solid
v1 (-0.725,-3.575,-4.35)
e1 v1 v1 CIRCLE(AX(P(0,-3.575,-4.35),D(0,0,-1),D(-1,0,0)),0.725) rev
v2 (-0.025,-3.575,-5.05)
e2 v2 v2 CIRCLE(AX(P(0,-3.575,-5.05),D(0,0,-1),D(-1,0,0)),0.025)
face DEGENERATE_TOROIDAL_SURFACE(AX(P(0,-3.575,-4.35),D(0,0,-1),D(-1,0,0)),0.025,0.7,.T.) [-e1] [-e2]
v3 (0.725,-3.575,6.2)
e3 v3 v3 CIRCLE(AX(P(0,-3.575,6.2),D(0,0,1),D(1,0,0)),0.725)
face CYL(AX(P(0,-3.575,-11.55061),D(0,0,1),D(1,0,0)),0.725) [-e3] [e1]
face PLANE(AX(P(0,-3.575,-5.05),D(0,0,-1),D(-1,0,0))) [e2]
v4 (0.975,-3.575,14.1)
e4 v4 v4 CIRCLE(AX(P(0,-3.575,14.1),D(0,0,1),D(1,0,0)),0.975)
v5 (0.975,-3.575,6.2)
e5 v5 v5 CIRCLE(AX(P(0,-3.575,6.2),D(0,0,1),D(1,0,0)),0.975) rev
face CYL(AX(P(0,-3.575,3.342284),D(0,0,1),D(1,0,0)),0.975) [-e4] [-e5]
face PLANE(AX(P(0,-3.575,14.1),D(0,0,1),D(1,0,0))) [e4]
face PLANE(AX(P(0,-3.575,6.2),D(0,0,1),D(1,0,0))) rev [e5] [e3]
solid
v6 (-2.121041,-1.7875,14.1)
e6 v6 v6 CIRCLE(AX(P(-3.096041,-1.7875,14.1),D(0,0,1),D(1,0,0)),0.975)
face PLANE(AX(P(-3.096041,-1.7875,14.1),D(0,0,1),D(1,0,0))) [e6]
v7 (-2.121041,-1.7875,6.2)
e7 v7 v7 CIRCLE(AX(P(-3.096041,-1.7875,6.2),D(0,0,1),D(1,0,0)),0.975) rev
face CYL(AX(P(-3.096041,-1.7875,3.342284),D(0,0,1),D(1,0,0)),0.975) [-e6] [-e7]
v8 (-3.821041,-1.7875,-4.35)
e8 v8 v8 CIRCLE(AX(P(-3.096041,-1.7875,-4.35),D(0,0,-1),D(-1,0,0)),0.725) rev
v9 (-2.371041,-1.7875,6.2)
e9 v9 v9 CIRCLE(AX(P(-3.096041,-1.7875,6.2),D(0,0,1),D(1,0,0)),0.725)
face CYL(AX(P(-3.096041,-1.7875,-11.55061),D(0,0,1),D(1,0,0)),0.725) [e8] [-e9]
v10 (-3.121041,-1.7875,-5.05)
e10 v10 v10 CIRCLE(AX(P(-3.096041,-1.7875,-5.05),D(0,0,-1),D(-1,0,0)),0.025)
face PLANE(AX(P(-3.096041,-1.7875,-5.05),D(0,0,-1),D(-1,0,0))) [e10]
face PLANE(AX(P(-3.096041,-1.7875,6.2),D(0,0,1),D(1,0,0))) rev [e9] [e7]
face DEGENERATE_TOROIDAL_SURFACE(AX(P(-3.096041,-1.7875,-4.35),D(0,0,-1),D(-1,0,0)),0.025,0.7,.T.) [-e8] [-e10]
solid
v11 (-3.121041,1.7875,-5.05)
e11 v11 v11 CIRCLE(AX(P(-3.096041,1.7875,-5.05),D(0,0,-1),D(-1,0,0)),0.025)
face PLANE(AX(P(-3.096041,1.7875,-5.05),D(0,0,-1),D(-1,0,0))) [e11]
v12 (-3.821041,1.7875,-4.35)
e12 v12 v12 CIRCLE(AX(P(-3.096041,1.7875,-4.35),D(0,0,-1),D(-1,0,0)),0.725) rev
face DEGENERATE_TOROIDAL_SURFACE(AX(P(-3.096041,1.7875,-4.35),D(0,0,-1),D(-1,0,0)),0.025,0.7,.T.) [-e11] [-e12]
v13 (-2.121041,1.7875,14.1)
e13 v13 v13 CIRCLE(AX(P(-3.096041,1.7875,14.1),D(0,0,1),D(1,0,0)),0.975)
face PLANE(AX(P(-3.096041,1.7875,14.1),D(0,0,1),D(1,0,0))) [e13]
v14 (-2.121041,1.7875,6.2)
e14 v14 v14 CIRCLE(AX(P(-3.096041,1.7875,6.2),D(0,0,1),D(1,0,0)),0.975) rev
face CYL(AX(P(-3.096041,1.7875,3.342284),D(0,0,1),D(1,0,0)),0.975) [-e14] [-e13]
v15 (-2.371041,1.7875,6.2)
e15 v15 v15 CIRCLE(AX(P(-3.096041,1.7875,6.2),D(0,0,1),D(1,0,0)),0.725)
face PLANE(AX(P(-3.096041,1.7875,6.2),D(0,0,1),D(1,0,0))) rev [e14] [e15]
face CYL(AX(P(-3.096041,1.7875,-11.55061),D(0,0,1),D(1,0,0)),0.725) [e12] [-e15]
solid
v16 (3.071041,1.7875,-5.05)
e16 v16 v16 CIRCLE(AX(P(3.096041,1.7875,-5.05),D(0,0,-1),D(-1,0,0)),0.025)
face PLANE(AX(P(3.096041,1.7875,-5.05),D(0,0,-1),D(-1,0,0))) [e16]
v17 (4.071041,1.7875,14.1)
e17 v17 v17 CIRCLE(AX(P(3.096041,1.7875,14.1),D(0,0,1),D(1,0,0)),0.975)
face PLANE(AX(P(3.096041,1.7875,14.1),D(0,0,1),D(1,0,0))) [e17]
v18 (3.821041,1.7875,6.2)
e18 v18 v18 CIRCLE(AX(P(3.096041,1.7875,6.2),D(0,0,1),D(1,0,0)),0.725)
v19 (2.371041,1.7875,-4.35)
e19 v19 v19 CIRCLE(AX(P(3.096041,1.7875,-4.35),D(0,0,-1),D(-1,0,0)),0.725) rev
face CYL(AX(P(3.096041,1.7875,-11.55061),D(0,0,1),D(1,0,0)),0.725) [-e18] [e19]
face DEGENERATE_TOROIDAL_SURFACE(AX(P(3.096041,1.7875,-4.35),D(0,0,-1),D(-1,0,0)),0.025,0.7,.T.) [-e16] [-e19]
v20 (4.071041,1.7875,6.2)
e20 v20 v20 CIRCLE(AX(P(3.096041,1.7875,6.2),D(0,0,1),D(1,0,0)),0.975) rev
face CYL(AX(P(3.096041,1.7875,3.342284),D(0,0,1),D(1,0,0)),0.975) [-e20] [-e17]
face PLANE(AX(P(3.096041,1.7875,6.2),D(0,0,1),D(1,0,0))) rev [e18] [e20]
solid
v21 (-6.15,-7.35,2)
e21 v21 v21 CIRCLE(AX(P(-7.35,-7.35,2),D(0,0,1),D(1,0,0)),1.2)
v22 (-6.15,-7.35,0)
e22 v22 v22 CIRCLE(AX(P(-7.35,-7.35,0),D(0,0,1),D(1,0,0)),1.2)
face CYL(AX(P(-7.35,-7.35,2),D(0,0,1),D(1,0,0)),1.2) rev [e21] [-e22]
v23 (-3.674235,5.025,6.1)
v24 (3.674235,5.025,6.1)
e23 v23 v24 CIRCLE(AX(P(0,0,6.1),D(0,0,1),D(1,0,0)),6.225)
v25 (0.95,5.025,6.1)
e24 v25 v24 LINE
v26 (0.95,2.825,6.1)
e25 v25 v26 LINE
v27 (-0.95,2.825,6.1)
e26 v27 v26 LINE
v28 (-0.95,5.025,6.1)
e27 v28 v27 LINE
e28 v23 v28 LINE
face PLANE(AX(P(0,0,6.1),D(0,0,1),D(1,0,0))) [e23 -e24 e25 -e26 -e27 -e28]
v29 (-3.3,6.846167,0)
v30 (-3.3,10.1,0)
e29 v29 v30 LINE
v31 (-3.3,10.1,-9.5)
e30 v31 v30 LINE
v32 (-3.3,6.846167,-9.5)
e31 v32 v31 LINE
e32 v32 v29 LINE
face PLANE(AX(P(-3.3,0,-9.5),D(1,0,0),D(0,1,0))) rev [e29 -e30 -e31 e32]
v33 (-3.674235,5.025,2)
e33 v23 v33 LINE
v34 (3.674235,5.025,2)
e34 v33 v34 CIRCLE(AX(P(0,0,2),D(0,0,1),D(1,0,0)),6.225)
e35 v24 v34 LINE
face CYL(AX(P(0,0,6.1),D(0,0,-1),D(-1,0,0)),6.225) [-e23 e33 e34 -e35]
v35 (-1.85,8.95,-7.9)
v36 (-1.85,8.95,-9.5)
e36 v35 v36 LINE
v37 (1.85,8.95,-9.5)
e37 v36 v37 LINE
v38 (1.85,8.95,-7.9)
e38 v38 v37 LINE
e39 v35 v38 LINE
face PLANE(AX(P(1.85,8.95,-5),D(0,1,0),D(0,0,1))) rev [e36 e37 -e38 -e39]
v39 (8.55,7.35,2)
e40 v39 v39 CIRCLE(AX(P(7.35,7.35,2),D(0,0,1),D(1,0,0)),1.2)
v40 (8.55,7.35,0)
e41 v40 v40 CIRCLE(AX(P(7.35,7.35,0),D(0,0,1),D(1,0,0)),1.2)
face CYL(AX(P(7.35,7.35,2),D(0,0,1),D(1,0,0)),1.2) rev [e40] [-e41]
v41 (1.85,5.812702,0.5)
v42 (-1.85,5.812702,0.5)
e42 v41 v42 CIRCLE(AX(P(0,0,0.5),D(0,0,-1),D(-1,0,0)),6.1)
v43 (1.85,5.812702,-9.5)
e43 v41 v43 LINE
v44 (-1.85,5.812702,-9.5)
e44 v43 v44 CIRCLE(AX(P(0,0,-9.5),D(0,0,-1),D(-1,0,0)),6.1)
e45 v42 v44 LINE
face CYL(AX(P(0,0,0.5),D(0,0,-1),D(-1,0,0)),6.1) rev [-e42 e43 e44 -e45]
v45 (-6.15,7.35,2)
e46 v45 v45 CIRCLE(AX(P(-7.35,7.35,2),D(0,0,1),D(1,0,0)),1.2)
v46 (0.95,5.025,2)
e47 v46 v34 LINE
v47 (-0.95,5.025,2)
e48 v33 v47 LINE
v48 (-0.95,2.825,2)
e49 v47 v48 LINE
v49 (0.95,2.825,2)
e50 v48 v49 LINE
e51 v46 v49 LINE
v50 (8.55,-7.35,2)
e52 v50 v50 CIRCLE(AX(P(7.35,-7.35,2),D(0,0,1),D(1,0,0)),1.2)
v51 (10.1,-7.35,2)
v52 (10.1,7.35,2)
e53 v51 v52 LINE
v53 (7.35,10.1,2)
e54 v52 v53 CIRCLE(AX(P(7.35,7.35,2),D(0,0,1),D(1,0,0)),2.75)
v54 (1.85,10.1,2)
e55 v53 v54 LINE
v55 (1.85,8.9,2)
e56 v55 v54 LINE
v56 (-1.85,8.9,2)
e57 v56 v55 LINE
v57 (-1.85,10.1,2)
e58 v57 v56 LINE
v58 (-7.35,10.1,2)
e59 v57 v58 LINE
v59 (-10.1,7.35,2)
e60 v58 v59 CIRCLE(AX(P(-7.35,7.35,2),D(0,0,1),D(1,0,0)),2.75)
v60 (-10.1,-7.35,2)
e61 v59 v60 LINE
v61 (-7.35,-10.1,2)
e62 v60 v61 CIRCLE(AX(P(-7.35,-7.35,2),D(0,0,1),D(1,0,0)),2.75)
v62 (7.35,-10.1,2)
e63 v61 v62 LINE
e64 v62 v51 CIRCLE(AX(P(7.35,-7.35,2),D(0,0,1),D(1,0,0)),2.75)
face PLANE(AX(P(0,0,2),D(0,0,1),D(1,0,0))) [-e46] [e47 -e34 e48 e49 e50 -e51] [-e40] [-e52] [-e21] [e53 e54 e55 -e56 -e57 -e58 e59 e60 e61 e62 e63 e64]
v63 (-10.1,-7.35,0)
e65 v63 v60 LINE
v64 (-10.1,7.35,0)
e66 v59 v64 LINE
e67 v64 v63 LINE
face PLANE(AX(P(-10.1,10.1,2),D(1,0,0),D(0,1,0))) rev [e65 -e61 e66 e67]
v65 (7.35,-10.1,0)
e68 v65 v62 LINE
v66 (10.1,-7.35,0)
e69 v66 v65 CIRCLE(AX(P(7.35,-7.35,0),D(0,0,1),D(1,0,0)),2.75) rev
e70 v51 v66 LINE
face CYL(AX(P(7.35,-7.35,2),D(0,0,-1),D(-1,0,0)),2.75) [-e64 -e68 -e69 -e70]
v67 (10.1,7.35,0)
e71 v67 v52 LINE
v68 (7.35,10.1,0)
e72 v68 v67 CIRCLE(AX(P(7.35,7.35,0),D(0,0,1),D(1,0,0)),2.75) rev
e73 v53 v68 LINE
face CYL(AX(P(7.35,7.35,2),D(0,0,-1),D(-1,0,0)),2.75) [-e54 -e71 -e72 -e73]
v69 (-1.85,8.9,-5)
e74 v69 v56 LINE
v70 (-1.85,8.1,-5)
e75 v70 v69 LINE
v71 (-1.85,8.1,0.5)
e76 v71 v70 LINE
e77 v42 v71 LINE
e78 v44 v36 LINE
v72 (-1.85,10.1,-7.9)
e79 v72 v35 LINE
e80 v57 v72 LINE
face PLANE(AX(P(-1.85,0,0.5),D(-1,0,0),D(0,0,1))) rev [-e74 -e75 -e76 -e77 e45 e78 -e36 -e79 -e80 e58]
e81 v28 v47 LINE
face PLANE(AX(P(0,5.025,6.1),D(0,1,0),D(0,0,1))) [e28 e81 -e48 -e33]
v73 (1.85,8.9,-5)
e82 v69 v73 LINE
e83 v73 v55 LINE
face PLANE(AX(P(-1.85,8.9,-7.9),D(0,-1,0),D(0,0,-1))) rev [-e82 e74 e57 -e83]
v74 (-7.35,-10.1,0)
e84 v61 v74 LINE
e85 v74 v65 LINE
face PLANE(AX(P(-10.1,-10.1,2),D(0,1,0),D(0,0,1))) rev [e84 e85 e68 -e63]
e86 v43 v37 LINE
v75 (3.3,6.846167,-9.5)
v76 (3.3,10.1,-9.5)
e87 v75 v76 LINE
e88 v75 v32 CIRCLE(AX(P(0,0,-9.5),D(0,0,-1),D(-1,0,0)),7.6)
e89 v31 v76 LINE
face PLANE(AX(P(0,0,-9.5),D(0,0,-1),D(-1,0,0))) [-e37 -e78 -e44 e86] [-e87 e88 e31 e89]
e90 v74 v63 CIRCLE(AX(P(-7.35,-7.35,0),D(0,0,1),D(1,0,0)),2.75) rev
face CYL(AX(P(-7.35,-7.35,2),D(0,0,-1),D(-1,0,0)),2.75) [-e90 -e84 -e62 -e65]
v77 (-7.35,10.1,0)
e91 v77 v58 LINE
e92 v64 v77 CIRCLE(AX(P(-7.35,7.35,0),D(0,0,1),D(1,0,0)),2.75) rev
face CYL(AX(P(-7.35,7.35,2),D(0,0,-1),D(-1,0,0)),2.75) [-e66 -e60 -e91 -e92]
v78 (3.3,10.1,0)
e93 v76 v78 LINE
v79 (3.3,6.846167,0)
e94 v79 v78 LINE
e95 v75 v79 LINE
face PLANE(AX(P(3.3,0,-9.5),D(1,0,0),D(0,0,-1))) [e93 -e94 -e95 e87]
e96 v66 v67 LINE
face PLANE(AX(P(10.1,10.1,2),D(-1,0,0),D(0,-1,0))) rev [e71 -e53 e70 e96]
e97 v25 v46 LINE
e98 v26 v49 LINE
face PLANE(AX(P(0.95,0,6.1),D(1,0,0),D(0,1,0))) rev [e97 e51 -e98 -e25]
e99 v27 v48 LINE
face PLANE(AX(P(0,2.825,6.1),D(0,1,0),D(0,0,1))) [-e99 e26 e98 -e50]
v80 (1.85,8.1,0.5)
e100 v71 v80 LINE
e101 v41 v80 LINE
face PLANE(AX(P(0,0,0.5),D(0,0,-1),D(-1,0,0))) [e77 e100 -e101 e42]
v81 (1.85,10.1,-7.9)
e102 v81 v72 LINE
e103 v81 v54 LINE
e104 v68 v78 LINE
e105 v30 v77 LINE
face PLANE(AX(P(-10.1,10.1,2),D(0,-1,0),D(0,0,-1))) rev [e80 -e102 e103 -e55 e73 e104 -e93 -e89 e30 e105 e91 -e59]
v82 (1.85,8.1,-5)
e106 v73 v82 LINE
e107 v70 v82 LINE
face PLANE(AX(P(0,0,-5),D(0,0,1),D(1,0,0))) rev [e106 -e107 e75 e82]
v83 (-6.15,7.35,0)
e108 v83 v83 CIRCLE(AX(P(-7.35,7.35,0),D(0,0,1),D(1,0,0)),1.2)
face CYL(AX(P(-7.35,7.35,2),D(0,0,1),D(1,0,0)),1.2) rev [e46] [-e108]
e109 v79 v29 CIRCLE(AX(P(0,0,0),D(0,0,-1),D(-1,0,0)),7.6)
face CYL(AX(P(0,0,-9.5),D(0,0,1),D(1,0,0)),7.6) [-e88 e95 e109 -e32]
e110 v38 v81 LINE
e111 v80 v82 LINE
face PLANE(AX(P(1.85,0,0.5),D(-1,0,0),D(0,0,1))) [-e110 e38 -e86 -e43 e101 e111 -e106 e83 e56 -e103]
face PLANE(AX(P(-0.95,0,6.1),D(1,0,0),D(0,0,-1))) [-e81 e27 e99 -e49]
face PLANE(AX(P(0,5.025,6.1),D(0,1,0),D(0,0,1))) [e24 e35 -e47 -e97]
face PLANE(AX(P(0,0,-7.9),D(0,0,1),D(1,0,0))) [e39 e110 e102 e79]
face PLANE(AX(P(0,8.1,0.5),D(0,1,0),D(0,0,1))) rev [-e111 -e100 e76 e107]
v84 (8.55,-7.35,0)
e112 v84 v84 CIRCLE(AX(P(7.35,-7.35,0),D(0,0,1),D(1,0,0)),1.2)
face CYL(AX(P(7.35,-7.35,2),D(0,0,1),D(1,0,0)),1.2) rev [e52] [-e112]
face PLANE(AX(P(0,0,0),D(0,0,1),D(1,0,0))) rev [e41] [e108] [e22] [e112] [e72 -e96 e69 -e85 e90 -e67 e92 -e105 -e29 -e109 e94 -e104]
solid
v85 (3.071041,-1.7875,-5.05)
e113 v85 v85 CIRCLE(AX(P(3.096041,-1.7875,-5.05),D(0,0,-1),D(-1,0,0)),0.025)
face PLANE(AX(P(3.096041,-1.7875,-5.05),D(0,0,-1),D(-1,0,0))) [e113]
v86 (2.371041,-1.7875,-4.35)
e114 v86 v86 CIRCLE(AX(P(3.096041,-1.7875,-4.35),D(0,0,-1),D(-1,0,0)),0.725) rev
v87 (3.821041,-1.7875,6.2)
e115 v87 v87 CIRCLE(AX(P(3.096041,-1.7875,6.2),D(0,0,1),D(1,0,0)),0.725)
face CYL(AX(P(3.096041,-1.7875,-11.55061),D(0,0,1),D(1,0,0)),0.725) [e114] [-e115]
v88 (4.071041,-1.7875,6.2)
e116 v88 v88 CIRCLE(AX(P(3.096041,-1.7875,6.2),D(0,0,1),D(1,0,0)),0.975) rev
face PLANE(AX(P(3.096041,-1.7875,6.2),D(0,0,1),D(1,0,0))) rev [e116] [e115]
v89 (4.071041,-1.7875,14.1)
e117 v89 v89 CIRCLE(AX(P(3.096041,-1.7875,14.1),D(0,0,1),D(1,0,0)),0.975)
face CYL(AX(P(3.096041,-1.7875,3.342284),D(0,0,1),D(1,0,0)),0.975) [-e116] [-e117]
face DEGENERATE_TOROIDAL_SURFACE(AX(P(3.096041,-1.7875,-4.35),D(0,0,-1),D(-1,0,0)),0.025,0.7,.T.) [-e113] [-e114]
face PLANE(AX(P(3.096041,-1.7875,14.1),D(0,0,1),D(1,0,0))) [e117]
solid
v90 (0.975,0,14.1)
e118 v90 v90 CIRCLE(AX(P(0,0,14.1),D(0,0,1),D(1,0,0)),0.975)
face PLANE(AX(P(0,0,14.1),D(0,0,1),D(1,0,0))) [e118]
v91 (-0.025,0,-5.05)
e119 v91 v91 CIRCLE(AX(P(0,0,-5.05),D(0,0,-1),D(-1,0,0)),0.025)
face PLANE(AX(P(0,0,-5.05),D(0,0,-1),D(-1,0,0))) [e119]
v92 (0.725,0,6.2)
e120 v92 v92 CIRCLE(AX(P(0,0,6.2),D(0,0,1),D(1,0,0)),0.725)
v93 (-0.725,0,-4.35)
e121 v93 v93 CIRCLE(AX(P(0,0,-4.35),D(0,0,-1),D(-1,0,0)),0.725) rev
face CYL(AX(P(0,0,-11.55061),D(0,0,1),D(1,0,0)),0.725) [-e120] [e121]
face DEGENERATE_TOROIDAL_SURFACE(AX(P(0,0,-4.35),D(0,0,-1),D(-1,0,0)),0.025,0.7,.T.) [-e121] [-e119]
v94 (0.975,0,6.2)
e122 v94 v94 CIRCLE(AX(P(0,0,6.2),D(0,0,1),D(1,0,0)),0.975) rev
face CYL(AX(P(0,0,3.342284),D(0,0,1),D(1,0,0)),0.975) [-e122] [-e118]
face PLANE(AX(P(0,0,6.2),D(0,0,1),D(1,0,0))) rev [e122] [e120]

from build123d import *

# Parameters (mm, degrees)
SKICA1_W                     = 20.2
SKICA1_H                     = 20.2
P_IDAT_VYSUNUT_M1_DEPTH      = 2
F_2_4_2_4_PR_M_R_D_RY1_D     = 2.4
F_2_4_2_4_PR_M_R_D_RY1_DEPTH = 25
F_2_4_2_4_PR_M_R_D_RY1_TIP   = 0.721032743
ZAOBLIT1_R                   = 2.75
P_IDAT_VYSUNUT_M2_DEPTH      = 9.5
ODEBRAT_VYSUNUT_M1_DEPTH     = 10
SKICA7_W                     = 3.7
SKICA7_H                     = 1.7
ODEBRAT_VYSUNUT_M2_DEPTH     = 4.5
SKICA8_W                     = 3.7
SKICA8_H                     = 2.4
ODEBRAT_VYSUNUT_M3_DEPTH     = 9.9
P_IDAT_VYSUNUT_M4_DEPTH      = 4.1
P_IDAT_VYSUNUT_M3_DEPTH      = 5.55
P_IDAT_VYSUNUT_M3_DEPTH_BACK = 13.6
SKICA9_R                     = 0.725
ZAOBLIT2_R                   = 0.7
SKICA11_R                    = 0.975
P_IDAT_VYSUNUT_M5_DEPTH      = 7.9


# Read off the part's stored shape, not the designer's step: Skica-pole2
with BuildPart() as part:
    # Skica1 → Přidat vysunutím1 (new body)
    with BuildSketch(Plane.XY):
        Rectangle(SKICA1_W, SKICA1_H)
    extrude(amount=P_IDAT_VYSUNUT_M1_DEPTH)

    # Ø2.4 (2.4) průměr díry1
    with Locations(Plane.XY.offset(2)):
        with Locations((-7.35, 7.35), (7.35, 7.35), (7.35, -7.35), (-7.35, -7.35)):
            Hole(F_2_4_2_4_PR_M_R_D_RY1_D / 2, depth=F_2_4_2_4_PR_M_R_D_RY1_DEPTH)
            with Locations((0, 0, -(F_2_4_2_4_PR_M_R_D_RY1_DEPTH + F_2_4_2_4_PR_M_R_D_RY1_TIP / 2))):  # 118° drill point
                Cone(0, F_2_4_2_4_PR_M_R_D_RY1_D / 2, F_2_4_2_4_PR_M_R_D_RY1_TIP, mode=Mode.SUBTRACT)

    # Zaoblit1
    zaoblit1_edges = [part.edges().sort_by_distance(p)[0] for p in [
        (10.1, -10.1, 1),
        (-10.1, -10.1, 1),
        (-10.1, 10.1, 1),
        (10.1, 10.1, 1),
    ]]
    fillet(zaoblit1_edges, radius=ZAOBLIT1_R)

    # Skica5 → Přidat vysunutím2 (add)
    with BuildSketch(Plane(origin=(0, 0, 0), x_dir=(-1, 0, 0), z_dir=(0, 0, -1))):
        with BuildLine():
            Line((-3.3, 6.846166811), (-3.3, 0))
            Line((-3.3, 0), (3.3, 0))
            Line((3.3, 0), (3.3, 6.846166811))
            ThreePointArc((3.3, 6.846166811), (0, 7.6), (-3.3, 6.846166811))
        make_face()
        with BuildLine():
            Line((3.3, 0), (-3.3, 0))
            Line((-3.3, 0), (-3.3, 6.846166811))
            ThreePointArc((-3.3, 6.846166811), (-4.042276586, -6.435837164), (7.6, 0))
            ThreePointArc((7.6, 0), (6.435837164, 4.042276586), (3.3, 6.846166811))
            Line((3.3, 6.846166811), (3.3, 0))
        make_face()
        with BuildLine():
            Line((-3.3, 10.1), (-3.3, 6.846166811))
            ThreePointArc((-3.3, 6.846166811), (0, 7.6), (3.3, 6.846166811))
            Line((3.3, 6.846166811), (3.3, 10.1))
            Line((3.3, 10.1), (-3.3, 10.1))
        make_face()
    extrude(amount=P_IDAT_VYSUNUT_M2_DEPTH)

    # Skica6 → Odebrat vysunutím1 (cut)
    with BuildSketch(Plane(origin=(0, 0, -9.5), x_dir=(-1, 0, 0), z_dir=(0, 0, -1))):
        with BuildLine():
            Line((1.85, 5.812701609), (1.85, 4.1))
            Line((1.85, 4.1), (-1.85, 4.1))
            Line((-1.85, 4.1), (-1.85, 5.812701609))
            ThreePointArc((-1.85, 5.812701609), (-3.600347205, -4.924175058), (6.1, 0))
            ThreePointArc((6.1, 0), (4.924175058, 3.600347205), (1.85, 5.812701609))
        make_face()
        with BuildLine():
            Line((-1.85, 4.1), (1.85, 4.1))
            Line((1.85, 4.1), (1.85, 5.812701609))
            ThreePointArc((1.85, 5.812701609), (0, 6.1), (-1.85, 5.812701609))
            Line((-1.85, 5.812701609), (-1.85, 4.1))
        make_face()
        with BuildLine():
            ThreePointArc((-1.85, 5.812701609), (0, 6.1), (1.85, 5.812701609))
            Line((1.85, 5.812701609), (1.85, 8.1))
            Line((1.85, 8.1), (-1.85, 8.1))
            Line((-1.85, 8.1), (-1.85, 5.812701609))
        make_face()
    extrude(amount=-ODEBRAT_VYSUNUT_M1_DEPTH, mode=Mode.SUBTRACT)

    # Skica7 → Odebrat vysunutím2 (cut)
    with BuildSketch(Plane(origin=(0, 0, -9.5), x_dir=(-1, 0, 0), z_dir=(0, 0, -1))):
        with Locations((0, 8.1)):
            Rectangle(SKICA7_W, SKICA7_H)
    extrude(amount=-ODEBRAT_VYSUNUT_M2_DEPTH, mode=Mode.SUBTRACT)

    # Skica8 → Odebrat vysunutím3 (cut)
    with BuildSketch(Plane.XY.offset(2)):
        with Locations((0, 10.1)):
            Rectangle(SKICA8_W, SKICA8_H)
    extrude(amount=-ODEBRAT_VYSUNUT_M3_DEPTH, mode=Mode.SUBTRACT)

    # Skica10 → Přidat vysunutím4 (add)
    with BuildSketch(Plane.XY.offset(2)):
        with BuildLine():
            Line((-0.95, 5.025), (-3.674234614, 5.025))
            ThreePointArc((-3.674234614, 5.025), (-2.817668764, -5.550798838), (6.225, 0))
            ThreePointArc((6.225, 0), (5.550798838, 2.817668764), (3.674234614, 5.025))
            Line((3.674234614, 5.025), (0.95, 5.025))
            Line((0.95, 5.025), (0.95, 2.825))
            Line((0.95, 2.825), (-0.95, 2.825))
            Line((-0.95, 2.825), (-0.95, 5.025))
        make_face()
    extrude(amount=P_IDAT_VYSUNUT_M4_DEPTH)


with BuildPart() as body_2:
    # Skica9 → Přidat vysunutím3 (new, two sides: drawn at the far end of the back side and taken through both)
    with BuildSketch(Plane(origin=(0, 0, 0.5), x_dir=(-1, 0, 0), z_dir=(0, 0, -1)).offset(-P_IDAT_VYSUNUT_M3_DEPTH_BACK)):
        with Locations(Location((0, 0, 0), (0, 0, 180))):
            Circle(SKICA9_R)
    extrude(amount=P_IDAT_VYSUNUT_M3_DEPTH + P_IDAT_VYSUNUT_M3_DEPTH_BACK)

    # Zaoblit2
    zaoblit2_edges = [body_2.edges().sort_by_distance(p)[0] for p in [
        (-0.725, 0, -5.05),
    ]]
    fillet(zaoblit2_edges, radius=ZAOBLIT2_R)

    # Skica11 → Přidat vysunutím5 (add)
    with BuildSketch(Plane.XY.offset(14.1)):
        Circle(SKICA11_R)
    extrude(amount=-P_IDAT_VYSUNUT_M5_DEPTH)


with BuildPart() as body_3:
    # Skica-pole2 outline → Skica-pole2 (revolve)
    with BuildSketch(Plane(origin=(3.096040819, 1.7875, 0), x_dir=(1, 0, 0), z_dir=(0, -1, 0))):
        with BuildLine():
            ThreePointArc((0.025, -5.05), (0.519974747, -4.844974747), (0.725, -4.35))
            Line((0.725, -4.35), (0.725, 6.2))
            Line((0.725, 6.2), (0.975, 6.2))
            Line((0.975, 6.2), (0.975, 14.1))
            Line((0.975, 14.1), (0, 14.1))
            Line((0, 14.1), (0, -5.05))
            Line((0, -5.05), (0.025, -5.05))
        make_face()
    revolve(axis=Axis((3.096040819, 1.7875, 0), (0, 0, 1)))


with BuildPart() as body_4:
    # Skica-pole2 2 outline → Skica-pole2 2 (revolve)
    with BuildSketch(Plane(origin=(3.096040819, -1.7875, 0), x_dir=(1, 0, 0), z_dir=(0, -1, 0))):
        with BuildLine():
            Line((0, 14.1), (0, -5.05))
            Line((0, -5.05), (0.025, -5.05))
            ThreePointArc((0.025, -5.05), (0.519974747, -4.844974747), (0.725, -4.35))
            Line((0.725, -4.35), (0.725, 6.2))
            Line((0.725, 6.2), (0.975, 6.2))
            Line((0.975, 6.2), (0.975, 14.1))
            Line((0.975, 14.1), (0, 14.1))
        make_face()
    revolve(axis=Axis((3.096040819, -1.7875, 0), (0, 0, 1)))


with BuildPart() as body_5:
    # Skica-pole2 3 outline → Skica-pole2 3 (revolve)
    with BuildSketch(Plane.XZ.offset(3.575)):
        with BuildLine():
            Line((0, 14.1), (0, -5.05))
            Line((0, -5.05), (0.025, -5.05))
            ThreePointArc((0.025, -5.05), (0.519974747, -4.844974747), (0.725, -4.35))
            Line((0.725, -4.35), (0.725, 6.2))
            Line((0.725, 6.2), (0.975, 6.2))
            Line((0.975, 6.2), (0.975, 14.1))
            Line((0.975, 14.1), (0, 14.1))
        make_face()
    revolve(axis=Axis((0, -3.575, 0), (0, 0, 1)))


with BuildPart() as body_6:
    # Skica-pole2 4 outline → Skica-pole2 4 (revolve)
    with BuildSketch(Plane(origin=(-3.096040819, -1.7875, 0), x_dir=(1, 0, 0), z_dir=(0, -1, 0))):
        with BuildLine():
            Line((0, 14.1), (0, -5.05))
            Line((0, -5.05), (0.025, -5.05))
            ThreePointArc((0.025, -5.05), (0.519974747, -4.844974747), (0.725, -4.35))
            Line((0.725, -4.35), (0.725, 6.2))
            Line((0.725, 6.2), (0.975, 6.2))
            Line((0.975, 6.2), (0.975, 14.1))
            Line((0.975, 14.1), (0, 14.1))
        make_face()
    revolve(axis=Axis((-3.096040819, -1.7875, 0), (0, 0, 1)))


with BuildPart() as body_7:
    # Skica-pole2 5 outline → Skica-pole2 5 (revolve)
    with BuildSketch(Plane(origin=(-3.096040819, 1.7875, 0), x_dir=(1, 0, 0), z_dir=(0, -1, 0))):
        with BuildLine():
            Line((0, 14.1), (0, -5.05))
            Line((0, -5.05), (0.025, -5.05))
            ThreePointArc((0.025, -5.05), (0.519974747, -4.844974747), (0.725, -4.35))
            Line((0.725, -4.35), (0.725, 6.2))
            Line((0.725, 6.2), (0.975, 6.2))
            Line((0.975, 6.2), (0.975, 14.1))
            Line((0.975, 14.1), (0, 14.1))
        make_face()
    revolve(axis=Axis((-3.096040819, 1.7875, 0), (0, 0, 1)))


solid = Compound([part.part, body_2.part, body_3.part, body_4.part, body_5.part, body_6.part, body_7.part])
